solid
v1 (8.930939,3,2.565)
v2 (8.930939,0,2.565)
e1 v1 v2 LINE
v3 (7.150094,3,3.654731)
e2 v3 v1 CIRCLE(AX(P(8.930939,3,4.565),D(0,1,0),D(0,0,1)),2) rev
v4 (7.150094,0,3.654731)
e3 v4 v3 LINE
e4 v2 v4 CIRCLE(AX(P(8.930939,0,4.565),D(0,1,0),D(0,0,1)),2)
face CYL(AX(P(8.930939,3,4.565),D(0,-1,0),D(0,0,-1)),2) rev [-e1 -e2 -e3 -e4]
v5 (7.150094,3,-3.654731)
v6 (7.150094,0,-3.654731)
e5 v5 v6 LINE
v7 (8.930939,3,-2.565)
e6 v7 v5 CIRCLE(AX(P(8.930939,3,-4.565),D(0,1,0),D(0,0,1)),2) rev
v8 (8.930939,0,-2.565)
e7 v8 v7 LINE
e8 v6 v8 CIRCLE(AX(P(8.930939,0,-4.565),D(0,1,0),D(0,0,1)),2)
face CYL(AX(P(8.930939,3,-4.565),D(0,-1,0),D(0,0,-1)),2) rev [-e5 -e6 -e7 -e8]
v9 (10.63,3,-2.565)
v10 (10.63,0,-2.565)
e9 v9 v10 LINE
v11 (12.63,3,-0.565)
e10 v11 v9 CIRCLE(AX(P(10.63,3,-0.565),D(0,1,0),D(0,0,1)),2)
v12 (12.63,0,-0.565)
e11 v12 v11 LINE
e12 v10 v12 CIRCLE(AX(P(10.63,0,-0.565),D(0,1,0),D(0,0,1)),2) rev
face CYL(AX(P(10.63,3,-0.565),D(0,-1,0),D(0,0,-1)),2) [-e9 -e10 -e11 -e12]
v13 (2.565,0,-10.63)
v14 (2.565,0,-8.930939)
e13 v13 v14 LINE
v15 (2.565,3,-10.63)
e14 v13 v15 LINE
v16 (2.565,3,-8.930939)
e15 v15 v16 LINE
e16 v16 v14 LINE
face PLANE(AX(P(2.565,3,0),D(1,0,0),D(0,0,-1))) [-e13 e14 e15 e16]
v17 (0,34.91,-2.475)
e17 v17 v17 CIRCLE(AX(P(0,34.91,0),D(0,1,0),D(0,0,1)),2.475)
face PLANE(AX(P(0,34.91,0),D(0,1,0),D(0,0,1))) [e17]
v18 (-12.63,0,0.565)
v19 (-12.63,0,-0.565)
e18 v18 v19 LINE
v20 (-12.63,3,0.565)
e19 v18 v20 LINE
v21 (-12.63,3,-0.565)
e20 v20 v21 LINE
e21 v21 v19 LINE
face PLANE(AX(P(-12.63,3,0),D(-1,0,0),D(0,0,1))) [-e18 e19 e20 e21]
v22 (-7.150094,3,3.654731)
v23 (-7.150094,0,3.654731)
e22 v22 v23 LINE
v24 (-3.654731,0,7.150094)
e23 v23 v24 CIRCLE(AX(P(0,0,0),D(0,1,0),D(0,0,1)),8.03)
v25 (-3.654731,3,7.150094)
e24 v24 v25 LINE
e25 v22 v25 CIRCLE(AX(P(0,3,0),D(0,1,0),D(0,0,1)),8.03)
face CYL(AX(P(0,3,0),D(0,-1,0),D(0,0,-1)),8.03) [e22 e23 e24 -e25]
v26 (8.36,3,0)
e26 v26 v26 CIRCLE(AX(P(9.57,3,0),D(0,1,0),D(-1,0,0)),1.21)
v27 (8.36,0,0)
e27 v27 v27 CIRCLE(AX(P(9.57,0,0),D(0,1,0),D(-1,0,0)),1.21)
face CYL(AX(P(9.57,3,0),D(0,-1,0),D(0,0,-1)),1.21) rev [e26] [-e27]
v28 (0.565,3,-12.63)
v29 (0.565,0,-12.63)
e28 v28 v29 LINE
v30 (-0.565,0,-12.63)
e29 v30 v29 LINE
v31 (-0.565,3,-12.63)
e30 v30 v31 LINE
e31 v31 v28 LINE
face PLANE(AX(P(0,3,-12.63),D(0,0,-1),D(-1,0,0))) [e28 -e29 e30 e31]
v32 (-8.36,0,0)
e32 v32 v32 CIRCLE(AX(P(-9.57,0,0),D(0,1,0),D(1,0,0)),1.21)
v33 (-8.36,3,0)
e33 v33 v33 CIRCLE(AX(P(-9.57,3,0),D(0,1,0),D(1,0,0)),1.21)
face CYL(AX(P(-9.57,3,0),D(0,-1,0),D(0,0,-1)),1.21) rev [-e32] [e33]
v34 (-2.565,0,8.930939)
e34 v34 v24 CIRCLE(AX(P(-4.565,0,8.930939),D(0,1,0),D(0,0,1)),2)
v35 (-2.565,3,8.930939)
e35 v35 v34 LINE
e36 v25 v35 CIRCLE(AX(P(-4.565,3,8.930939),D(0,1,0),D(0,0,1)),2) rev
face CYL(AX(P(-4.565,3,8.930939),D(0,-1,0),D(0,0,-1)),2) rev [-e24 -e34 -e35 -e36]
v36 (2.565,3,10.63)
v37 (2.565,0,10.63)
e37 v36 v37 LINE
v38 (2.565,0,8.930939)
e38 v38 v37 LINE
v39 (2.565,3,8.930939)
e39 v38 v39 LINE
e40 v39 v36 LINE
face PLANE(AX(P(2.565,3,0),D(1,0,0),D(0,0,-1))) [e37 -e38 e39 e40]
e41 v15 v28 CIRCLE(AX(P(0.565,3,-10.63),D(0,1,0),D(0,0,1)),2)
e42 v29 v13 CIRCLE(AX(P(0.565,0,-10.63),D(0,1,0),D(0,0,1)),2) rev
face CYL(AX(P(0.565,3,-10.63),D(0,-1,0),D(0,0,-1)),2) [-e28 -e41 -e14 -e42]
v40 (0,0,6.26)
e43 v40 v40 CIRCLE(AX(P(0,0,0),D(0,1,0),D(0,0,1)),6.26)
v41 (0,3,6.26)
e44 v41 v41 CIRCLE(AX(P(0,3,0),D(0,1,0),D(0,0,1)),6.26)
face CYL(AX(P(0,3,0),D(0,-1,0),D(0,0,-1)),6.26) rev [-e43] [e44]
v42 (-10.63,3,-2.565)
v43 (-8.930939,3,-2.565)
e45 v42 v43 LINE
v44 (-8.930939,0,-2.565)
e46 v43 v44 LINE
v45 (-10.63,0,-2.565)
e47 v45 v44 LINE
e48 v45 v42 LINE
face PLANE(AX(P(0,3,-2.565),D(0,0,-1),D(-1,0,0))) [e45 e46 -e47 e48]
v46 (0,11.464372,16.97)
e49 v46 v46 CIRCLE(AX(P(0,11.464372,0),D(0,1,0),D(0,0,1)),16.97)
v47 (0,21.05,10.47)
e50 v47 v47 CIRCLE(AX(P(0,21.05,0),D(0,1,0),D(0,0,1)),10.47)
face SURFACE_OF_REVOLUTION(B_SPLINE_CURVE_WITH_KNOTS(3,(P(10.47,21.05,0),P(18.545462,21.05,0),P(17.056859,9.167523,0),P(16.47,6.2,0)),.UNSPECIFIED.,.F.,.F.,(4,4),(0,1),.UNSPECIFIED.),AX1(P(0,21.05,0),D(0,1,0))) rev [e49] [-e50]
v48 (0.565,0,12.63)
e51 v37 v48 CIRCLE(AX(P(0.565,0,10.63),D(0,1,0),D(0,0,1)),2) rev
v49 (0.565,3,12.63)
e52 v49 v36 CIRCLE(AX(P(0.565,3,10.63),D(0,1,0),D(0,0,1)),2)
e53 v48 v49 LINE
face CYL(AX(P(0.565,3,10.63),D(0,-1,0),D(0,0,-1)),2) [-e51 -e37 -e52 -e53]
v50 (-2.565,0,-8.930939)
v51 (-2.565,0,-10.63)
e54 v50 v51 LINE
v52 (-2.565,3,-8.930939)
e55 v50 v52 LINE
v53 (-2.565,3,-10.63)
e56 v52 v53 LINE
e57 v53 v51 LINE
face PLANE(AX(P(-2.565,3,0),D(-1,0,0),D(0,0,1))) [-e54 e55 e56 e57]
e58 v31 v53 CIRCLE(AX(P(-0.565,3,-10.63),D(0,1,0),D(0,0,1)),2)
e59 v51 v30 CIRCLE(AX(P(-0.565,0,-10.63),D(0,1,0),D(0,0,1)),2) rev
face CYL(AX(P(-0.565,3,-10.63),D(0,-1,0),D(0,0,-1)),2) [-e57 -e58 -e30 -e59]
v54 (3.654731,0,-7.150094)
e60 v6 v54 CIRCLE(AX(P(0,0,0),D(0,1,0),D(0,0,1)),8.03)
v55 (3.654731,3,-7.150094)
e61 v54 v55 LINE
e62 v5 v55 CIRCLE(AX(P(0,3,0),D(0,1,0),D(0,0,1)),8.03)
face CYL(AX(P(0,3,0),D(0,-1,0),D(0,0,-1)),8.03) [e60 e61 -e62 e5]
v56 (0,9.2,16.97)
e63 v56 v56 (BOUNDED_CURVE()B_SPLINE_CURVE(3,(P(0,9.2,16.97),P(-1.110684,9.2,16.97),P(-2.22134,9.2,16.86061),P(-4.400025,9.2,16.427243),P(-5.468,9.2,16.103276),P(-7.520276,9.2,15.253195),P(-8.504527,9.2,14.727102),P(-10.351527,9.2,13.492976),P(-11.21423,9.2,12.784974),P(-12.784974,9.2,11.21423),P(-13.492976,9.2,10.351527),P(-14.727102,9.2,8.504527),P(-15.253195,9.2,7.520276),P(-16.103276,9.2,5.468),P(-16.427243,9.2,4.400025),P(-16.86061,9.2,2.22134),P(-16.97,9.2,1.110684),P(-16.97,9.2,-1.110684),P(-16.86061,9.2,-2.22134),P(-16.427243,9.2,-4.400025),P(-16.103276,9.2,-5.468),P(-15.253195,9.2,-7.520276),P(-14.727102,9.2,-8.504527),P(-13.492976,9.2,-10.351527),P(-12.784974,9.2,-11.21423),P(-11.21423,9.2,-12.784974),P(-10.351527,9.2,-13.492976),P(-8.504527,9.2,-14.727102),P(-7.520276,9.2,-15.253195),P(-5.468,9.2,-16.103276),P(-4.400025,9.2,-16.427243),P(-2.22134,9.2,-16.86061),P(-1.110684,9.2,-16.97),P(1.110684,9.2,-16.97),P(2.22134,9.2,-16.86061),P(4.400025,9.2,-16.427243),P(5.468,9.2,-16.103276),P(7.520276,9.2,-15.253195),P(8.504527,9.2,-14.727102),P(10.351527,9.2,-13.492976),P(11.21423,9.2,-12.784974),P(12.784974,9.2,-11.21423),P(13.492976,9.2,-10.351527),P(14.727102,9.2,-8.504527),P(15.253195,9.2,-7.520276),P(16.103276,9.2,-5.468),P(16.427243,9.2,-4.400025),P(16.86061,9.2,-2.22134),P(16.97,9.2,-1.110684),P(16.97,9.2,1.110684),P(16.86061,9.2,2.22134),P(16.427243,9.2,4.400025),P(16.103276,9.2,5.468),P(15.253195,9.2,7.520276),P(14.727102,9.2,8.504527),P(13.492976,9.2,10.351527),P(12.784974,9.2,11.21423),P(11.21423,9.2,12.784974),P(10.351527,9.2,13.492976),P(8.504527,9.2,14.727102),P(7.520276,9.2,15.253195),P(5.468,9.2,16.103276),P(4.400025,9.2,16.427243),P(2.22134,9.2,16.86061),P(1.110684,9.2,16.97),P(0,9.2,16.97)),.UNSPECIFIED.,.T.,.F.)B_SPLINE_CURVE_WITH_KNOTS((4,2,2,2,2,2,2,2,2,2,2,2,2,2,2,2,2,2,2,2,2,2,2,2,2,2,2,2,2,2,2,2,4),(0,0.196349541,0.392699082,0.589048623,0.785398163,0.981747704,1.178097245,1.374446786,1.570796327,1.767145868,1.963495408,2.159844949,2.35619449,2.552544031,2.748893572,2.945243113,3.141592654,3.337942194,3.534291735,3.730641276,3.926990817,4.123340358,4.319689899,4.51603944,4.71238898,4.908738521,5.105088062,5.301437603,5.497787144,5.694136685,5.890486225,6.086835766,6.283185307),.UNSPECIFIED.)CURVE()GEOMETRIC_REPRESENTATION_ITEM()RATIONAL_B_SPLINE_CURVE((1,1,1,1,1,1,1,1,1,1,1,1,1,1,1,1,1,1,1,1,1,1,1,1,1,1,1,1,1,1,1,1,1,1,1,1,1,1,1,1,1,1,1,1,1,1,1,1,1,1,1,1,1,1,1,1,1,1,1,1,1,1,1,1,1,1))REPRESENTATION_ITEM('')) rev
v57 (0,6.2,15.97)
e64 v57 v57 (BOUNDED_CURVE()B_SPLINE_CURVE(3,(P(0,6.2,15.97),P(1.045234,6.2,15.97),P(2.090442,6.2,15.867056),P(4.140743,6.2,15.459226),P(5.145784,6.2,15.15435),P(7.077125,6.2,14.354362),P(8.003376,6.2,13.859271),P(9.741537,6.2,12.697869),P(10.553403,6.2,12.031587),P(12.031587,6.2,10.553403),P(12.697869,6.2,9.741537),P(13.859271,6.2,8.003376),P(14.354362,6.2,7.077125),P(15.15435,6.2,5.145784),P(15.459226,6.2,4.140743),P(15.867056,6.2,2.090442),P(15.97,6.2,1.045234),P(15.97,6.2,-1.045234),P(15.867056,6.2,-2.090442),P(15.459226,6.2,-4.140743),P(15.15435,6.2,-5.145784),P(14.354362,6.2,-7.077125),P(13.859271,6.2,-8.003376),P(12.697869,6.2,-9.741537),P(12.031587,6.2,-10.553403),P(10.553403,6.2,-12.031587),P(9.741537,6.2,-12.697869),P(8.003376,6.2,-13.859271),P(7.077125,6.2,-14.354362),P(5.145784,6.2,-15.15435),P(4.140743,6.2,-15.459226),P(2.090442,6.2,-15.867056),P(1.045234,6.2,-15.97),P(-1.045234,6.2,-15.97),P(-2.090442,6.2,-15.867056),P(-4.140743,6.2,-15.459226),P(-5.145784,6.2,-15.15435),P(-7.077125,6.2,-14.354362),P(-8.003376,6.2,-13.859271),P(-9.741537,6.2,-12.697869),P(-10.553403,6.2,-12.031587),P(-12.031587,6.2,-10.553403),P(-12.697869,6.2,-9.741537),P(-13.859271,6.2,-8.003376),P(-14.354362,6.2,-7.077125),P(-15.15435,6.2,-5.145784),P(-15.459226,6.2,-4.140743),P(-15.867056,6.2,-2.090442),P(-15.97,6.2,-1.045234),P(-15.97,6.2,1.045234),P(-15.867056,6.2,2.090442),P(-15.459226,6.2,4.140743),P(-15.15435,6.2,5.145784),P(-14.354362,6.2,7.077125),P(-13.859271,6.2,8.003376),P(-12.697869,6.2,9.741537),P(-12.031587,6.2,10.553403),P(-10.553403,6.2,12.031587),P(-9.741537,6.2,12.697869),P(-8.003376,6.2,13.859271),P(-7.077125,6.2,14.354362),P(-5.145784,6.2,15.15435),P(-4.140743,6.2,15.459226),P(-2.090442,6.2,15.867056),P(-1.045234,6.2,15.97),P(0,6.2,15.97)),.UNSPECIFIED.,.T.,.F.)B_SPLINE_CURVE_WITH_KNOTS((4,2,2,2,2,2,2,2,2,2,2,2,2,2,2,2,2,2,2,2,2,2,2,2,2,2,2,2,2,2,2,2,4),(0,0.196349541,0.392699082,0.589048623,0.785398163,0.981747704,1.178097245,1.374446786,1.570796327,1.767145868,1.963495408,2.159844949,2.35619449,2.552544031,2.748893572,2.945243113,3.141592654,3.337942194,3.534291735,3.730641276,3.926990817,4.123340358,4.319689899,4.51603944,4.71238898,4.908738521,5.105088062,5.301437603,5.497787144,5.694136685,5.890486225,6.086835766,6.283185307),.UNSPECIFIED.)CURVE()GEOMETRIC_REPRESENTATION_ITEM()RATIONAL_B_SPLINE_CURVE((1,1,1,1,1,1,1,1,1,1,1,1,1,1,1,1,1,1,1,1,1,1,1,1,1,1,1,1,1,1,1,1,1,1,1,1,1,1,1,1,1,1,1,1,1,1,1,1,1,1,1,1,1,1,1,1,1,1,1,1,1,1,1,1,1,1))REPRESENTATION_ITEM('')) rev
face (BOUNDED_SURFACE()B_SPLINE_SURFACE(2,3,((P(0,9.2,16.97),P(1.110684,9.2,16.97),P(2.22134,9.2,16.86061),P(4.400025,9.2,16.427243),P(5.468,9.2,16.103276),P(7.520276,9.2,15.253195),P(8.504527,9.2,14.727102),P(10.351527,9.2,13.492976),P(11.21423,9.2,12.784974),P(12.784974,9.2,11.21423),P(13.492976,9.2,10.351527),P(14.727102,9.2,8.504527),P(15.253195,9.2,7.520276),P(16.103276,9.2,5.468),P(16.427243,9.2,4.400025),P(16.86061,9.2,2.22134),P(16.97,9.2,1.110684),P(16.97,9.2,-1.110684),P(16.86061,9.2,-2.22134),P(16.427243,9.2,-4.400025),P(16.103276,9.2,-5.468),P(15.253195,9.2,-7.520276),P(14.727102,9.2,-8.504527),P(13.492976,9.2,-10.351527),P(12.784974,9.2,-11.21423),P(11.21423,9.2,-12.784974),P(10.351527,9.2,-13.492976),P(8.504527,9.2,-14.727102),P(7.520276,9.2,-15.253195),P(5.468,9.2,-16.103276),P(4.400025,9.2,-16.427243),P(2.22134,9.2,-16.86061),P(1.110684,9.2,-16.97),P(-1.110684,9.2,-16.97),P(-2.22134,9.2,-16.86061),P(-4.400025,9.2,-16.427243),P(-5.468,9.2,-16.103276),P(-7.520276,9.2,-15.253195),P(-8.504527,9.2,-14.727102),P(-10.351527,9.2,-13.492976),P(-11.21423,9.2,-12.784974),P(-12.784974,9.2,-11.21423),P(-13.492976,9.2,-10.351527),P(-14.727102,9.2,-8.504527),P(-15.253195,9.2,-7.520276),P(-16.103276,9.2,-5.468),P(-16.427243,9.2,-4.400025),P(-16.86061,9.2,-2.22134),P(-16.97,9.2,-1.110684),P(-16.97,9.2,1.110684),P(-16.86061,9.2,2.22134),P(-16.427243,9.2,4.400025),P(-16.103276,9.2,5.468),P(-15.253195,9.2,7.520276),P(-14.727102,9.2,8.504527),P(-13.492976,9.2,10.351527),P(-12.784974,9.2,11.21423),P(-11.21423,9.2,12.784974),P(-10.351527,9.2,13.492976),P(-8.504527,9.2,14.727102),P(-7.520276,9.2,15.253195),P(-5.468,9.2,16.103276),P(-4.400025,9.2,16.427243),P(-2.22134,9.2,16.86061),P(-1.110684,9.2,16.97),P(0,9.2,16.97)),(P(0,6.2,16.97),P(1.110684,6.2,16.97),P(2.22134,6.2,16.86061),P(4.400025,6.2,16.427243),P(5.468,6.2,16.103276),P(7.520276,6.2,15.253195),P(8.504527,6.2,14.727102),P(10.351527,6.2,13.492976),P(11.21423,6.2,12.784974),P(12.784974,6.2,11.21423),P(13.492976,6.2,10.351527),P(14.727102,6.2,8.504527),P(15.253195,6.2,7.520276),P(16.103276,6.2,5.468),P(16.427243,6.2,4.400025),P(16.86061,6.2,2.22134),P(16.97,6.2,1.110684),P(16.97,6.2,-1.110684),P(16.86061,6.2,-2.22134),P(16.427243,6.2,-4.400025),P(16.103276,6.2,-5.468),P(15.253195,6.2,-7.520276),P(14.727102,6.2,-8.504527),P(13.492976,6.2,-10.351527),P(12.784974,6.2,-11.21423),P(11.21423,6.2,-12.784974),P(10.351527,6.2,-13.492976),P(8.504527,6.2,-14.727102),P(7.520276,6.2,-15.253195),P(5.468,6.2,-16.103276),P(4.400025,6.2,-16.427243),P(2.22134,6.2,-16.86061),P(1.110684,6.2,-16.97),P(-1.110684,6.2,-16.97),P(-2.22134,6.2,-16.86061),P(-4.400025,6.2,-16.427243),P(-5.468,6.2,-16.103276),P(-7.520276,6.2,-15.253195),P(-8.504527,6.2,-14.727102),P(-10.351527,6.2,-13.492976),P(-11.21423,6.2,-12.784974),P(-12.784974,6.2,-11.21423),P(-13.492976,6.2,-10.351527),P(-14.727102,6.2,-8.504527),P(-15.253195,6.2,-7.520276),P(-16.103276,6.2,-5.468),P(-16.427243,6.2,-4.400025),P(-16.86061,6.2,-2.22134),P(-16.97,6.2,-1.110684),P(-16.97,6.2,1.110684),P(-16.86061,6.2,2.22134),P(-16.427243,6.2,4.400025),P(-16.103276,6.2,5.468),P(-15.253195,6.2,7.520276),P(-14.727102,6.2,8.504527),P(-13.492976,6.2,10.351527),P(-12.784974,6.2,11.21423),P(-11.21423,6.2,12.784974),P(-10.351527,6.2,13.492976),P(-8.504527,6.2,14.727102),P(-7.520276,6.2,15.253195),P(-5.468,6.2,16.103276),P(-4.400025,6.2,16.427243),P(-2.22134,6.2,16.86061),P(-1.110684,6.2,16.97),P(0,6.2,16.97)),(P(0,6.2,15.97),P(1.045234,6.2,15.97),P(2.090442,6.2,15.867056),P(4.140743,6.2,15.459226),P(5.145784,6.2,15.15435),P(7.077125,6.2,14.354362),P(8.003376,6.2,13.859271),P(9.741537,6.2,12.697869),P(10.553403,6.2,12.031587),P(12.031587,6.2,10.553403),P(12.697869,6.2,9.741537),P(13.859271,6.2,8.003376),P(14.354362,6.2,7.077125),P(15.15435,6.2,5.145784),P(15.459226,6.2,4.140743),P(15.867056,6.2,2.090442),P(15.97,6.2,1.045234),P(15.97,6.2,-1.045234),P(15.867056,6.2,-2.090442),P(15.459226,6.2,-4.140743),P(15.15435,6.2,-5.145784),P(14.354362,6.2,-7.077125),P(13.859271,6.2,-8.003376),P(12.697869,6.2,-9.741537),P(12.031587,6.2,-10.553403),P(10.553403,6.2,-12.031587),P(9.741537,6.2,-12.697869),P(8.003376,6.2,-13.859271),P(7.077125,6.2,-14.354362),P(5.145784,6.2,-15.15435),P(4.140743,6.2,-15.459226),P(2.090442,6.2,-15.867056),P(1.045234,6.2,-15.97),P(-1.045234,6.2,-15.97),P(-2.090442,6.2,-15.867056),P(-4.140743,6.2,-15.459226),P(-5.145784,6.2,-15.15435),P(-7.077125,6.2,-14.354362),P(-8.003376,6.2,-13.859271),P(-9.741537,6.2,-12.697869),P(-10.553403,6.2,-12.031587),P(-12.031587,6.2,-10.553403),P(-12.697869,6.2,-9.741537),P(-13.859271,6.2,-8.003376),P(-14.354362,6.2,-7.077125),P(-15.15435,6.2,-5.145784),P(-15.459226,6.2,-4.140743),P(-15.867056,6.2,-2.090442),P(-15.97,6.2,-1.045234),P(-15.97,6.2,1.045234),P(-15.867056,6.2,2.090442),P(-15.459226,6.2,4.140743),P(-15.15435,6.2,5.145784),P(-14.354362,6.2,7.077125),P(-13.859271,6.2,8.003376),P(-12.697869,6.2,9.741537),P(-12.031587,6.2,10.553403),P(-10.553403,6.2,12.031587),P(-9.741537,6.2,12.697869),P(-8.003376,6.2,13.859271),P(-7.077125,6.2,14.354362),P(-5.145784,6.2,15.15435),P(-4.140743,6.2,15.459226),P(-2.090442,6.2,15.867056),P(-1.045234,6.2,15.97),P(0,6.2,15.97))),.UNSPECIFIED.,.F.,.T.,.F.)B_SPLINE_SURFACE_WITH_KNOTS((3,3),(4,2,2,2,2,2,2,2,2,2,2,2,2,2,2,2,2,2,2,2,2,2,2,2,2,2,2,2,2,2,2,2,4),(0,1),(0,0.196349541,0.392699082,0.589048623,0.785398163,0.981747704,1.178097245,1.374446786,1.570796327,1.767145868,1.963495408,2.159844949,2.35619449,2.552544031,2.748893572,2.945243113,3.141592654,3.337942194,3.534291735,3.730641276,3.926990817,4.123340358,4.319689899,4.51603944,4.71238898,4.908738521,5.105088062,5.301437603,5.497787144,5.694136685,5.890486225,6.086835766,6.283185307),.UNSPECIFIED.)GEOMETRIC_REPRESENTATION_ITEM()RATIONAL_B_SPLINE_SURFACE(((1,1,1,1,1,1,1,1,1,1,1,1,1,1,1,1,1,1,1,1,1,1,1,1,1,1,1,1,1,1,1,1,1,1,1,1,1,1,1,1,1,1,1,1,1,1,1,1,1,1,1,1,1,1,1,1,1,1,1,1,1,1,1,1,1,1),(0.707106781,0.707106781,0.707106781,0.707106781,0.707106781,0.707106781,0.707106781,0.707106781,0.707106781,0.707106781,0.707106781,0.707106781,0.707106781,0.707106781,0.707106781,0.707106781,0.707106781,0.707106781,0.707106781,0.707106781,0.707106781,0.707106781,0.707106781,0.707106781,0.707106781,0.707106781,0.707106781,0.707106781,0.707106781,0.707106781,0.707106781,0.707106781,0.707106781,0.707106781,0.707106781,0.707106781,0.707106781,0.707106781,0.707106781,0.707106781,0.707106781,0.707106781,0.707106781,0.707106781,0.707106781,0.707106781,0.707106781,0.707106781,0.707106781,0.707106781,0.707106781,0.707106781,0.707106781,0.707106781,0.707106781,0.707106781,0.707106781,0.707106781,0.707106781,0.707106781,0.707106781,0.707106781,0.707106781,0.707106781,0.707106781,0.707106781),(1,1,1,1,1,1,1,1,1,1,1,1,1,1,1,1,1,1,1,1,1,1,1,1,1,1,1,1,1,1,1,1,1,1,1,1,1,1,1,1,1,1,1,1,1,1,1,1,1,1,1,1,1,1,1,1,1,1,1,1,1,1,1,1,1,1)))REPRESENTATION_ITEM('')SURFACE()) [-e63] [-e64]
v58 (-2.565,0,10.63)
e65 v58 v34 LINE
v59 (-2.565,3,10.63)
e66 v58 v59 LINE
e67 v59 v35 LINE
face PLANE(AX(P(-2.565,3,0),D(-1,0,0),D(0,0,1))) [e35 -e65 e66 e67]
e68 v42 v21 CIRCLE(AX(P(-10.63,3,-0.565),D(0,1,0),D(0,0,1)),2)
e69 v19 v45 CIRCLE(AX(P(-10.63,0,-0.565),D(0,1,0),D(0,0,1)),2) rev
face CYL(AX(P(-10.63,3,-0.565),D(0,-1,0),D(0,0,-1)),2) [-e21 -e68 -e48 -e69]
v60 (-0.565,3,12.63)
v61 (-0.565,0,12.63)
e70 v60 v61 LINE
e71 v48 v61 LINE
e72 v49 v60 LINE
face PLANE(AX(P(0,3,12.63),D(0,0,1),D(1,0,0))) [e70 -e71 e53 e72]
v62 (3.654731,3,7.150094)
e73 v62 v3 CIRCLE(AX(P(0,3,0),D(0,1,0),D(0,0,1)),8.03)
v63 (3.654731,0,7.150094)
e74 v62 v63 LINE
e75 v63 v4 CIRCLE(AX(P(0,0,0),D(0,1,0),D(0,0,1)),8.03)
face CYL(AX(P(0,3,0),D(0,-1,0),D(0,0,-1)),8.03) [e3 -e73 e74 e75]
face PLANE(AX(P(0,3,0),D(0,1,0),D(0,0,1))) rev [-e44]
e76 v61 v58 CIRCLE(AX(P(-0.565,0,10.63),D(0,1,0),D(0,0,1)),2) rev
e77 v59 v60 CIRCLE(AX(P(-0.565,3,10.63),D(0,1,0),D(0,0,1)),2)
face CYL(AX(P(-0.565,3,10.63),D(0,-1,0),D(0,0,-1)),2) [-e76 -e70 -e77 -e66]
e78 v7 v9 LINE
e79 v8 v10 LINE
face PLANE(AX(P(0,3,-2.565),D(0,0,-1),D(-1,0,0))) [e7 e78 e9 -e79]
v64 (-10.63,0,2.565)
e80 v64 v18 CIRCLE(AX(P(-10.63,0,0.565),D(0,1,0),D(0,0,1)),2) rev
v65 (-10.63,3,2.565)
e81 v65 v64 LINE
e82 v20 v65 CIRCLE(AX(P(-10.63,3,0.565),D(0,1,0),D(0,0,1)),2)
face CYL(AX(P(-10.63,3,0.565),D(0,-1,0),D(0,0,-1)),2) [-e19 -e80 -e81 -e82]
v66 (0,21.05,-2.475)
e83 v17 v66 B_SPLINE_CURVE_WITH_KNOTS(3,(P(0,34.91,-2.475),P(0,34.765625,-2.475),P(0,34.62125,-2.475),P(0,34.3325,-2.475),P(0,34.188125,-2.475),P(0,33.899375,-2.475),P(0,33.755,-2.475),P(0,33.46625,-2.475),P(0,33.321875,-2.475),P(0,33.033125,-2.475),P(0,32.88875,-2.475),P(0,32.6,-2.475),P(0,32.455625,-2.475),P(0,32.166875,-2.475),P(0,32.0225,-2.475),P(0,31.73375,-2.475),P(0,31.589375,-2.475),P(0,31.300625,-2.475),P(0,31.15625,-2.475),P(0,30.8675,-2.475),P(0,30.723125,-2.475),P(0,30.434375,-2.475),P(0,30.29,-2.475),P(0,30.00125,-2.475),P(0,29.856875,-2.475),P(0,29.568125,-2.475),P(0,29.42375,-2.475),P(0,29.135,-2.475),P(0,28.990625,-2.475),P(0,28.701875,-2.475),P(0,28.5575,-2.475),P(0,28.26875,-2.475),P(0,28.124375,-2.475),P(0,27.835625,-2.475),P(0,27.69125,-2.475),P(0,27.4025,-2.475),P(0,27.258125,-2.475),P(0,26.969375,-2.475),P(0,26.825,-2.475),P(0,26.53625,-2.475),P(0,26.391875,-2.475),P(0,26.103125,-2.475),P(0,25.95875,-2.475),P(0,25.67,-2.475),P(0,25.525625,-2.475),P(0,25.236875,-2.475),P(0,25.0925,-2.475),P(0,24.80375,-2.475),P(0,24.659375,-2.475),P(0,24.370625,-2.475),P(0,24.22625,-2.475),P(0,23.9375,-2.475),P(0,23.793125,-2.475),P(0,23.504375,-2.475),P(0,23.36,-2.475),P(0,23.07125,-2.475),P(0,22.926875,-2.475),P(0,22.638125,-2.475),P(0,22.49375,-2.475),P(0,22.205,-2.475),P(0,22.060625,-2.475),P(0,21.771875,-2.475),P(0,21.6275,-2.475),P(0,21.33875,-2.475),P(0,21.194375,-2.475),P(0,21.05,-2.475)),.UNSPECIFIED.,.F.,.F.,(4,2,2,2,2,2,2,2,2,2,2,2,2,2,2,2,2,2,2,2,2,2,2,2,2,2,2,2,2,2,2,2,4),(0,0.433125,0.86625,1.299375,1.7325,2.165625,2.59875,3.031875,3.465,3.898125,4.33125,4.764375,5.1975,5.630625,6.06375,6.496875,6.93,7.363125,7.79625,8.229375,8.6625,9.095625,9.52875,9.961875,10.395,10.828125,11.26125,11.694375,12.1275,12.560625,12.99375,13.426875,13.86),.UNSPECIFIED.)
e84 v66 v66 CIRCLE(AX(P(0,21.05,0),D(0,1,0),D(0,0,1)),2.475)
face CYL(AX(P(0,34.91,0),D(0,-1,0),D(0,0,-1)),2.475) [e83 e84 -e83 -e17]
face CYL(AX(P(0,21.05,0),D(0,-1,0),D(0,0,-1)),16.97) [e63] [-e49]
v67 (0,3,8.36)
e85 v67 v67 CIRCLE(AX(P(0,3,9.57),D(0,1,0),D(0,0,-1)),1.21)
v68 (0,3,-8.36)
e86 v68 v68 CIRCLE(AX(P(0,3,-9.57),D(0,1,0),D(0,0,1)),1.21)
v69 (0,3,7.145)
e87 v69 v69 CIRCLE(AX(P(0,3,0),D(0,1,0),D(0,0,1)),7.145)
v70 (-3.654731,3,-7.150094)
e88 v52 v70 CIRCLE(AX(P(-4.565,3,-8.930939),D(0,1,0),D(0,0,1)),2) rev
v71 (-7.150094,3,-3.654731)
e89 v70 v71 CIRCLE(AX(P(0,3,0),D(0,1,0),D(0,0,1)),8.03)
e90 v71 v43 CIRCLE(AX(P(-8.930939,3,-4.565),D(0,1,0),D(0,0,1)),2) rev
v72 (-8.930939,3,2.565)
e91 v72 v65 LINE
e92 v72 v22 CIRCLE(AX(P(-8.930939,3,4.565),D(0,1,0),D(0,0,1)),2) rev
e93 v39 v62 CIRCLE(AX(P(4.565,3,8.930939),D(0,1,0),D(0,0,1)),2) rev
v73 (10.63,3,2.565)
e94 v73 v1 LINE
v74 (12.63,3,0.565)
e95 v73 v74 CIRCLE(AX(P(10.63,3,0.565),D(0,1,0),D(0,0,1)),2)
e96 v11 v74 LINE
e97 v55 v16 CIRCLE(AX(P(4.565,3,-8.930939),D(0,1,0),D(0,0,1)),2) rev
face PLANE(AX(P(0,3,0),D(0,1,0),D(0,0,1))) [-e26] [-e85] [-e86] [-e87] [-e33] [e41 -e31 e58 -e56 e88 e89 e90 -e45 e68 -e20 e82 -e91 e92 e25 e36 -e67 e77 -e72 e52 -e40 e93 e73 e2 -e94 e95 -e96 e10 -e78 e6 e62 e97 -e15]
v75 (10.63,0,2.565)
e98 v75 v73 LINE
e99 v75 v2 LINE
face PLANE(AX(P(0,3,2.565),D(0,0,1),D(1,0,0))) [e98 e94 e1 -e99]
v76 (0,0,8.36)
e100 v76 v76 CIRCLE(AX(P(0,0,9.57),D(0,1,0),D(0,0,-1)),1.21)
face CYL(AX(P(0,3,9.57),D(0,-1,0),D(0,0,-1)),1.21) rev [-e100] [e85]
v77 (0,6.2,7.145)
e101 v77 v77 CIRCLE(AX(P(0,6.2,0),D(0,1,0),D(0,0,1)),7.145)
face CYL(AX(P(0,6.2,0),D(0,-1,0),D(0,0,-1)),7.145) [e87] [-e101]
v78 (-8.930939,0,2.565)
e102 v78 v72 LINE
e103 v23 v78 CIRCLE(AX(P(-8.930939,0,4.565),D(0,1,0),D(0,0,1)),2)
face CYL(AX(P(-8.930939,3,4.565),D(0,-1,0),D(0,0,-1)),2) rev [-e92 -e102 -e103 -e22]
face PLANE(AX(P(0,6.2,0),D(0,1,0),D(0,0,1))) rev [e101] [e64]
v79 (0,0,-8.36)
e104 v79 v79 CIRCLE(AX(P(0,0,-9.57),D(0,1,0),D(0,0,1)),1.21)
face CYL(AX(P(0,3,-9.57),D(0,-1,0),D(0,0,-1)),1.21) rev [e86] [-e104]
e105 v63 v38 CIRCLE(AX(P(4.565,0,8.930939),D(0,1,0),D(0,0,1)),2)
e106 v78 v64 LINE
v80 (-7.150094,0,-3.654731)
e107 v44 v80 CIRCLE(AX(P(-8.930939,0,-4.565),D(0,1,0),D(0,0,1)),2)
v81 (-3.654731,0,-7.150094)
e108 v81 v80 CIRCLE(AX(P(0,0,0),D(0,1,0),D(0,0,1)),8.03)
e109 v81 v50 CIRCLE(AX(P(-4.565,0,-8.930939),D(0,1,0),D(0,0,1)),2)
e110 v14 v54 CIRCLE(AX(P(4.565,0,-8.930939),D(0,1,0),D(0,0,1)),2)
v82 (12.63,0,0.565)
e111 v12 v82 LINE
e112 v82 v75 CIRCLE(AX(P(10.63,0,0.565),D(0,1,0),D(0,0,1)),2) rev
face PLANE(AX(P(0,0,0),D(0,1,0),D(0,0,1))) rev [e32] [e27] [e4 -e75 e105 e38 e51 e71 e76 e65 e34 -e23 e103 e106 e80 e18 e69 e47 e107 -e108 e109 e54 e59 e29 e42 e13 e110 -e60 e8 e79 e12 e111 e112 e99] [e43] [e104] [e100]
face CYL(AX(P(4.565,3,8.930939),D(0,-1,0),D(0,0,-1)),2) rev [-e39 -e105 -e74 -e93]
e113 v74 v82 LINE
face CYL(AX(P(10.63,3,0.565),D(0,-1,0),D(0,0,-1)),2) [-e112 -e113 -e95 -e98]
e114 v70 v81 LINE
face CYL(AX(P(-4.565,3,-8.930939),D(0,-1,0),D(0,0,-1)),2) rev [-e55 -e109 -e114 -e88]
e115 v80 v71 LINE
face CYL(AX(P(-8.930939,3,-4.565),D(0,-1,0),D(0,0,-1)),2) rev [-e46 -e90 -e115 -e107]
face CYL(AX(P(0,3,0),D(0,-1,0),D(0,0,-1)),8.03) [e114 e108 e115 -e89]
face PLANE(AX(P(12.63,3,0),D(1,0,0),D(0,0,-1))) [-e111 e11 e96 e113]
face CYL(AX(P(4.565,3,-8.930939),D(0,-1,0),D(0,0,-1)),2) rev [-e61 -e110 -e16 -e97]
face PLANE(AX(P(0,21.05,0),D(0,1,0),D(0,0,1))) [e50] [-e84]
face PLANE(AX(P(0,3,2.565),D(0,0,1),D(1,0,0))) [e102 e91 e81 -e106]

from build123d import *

# Parameters (mm, degrees)
SKETCH1_R                = 8.03
SKETCH1_R_2              = 6.26
BOSS_EXTRUDE1_DEPTH      = 3
SKETCH1_4_R              = 1.21
BOSS_EXTRUDE3_DEPTH      = 3
FILLET1_R                = 2
CIRPATTERN1_COUNT        = 4
FILLET1_OF_CIRPATTERN1_R = 2
BOSS_EXTRUDE4_START      = 3
SKETCH1_5_R              = 7.145
SKETCH1_5_R_2            = 6.26
SKETCH1_5_R_3            = 2.475
BOSS_EXTRUDE4_DEPTH      = 3.2
BOSS_EXTRUDE5_START      = 6.2
SKETCH1_6_R              = 16.97
BOSS_EXTRUDE5_DEPTH      = 14.85
BOSS_EXTRUDE6_START      = 21.05
SKETCH1_7_R              = 2.475
BOSS_EXTRUDE6_DEPTH      = 13.86
FILLET3_SIZE             = 3
FILLET3_SIZE_2           = 1


with BuildPart() as part:
    # Sketch1 → Boss-Extrude1 (new body)
    with BuildSketch(Plane(origin=(0, 0, 0), x_dir=(1, 0, 0), z_dir=(0, 1, 0))):
        with Locations(Location((0, 0, 0), (0, 0, 270))):
            Circle(SKETCH1_R)
        with Locations(Location((0, 0, 0), (0, 0, 270))):
            Circle(SKETCH1_R_2, mode=Mode.SUBTRACT)
    extrude(amount=BOSS_EXTRUDE1_DEPTH)

    # Sketch1<4> → Boss-Extrude3 (add)
    with BuildSketch(Plane(origin=(0, 0, 0), x_dir=(1, 0, 0), z_dir=(0, 1, 0))):
        with BuildLine():
            Line((-2.565, 12.63), (-2.565, 7.609315015))
            ThreePointArc((-2.565, 7.609315015), (0, 8.03), (2.565, 7.609315015))
            Line((2.565, 7.609315015), (2.565, 12.63))
            Line((2.565, 12.63), (-2.565, 12.63))
        make_face()
        with Locations(Location((0, 9.57, 0), (0, 0, 270))):
            Circle(SKETCH1_4_R, mode=Mode.SUBTRACT)
    boss_extrude3 = extrude(amount=BOSS_EXTRUDE3_DEPTH)

    # Fillet1
    fillet1_edges = [part.edges().sort_by_distance(p)[0] for p in [
        (-2.565, 1.5, -7.609315015),
        (2.565, 1.5, -7.609315015),
        (2.565, 1.5, -12.63),
        (-2.565, 1.5, -12.63),
    ]]
    fillet(fillet1_edges, radius=FILLET1_R)

    # CirPattern1: Boss-Extrude3 ×4 about axis
    cirpattern1_axis = Axis((0, 0, 0), (0, 1, 0))
    for i in range(1, CIRPATTERN1_COUNT):
        add(boss_extrude3.rotate(cirpattern1_axis, i * 360 / CIRPATTERN1_COUNT))

    # Fillet1 of CirPattern1
    fillet1_of_cirpattern1_edges = [part.edges().sort_by_distance(p)[0] for p in [
        (-7.609315015, 1.5, 2.565),
        (-7.609315015, 1.5, -2.565),
        (-12.63, 1.5, -2.565),
        (-12.63, 1.5, 2.565),
        (2.565, 1.5, 7.609315015),
        (-2.565, 1.5, 7.609315015),
        (-2.565, 1.5, 12.63),
        (2.565, 1.5, 12.63),
        (7.609315015, 1.5, -2.565),
        (7.609315015, 1.5, 2.565),
        (12.63, 1.5, 2.565),
        (12.63, 1.5, -2.565),
    ]]
    fillet(fillet1_of_cirpattern1_edges, radius=FILLET1_OF_CIRPATTERN1_R)

    # Sketch1<5> → Boss-Extrude4 (add)
    # profile 1 of 3: a face of its own
    with BuildSketch(Plane(origin=(0, 0, 0), x_dir=(1, 0, 0), z_dir=(0, 1, 0)).offset(BOSS_EXTRUDE4_START)):
        with Locations(Location((0, 0, 0), (0, 0, 270))):
            Circle(SKETCH1_5_R)
        with Locations(Location((0, 0, 0), (0, 0, 270))):
            Circle(SKETCH1_5_R_2, mode=Mode.SUBTRACT)
    # profile 2 of 3: a face of its own
    with BuildSketch(Plane(origin=(0, 0, 0), x_dir=(1, 0, 0), z_dir=(0, 1, 0)).offset(BOSS_EXTRUDE4_START)):
        with Locations(Location((0, 0, 0), (0, 0, 270))):
            Circle(SKETCH1_5_R_2)
        Circle(SKETCH1_5_R_3, mode=Mode.SUBTRACT)
    # profile 3 of 3: a face of its own
    with BuildSketch(Plane(origin=(0, 0, 0), x_dir=(1, 0, 0), z_dir=(0, 1, 0)).offset(BOSS_EXTRUDE4_START)):
        Circle(SKETCH1_5_R_3)
    extrude(amount=BOSS_EXTRUDE4_DEPTH)

    # Sketch1<6> → Boss-Extrude5 (add)
    with BuildSketch(Plane(origin=(0, 0, 0), x_dir=(1, 0, 0), z_dir=(0, 1, 0)).offset(BOSS_EXTRUDE5_START)):
        with Locations(Location((0, 0, 0), (0, 0, 270))):
            Circle(SKETCH1_6_R)
    extrude(amount=BOSS_EXTRUDE5_DEPTH)

    # Sketch1<7> → Boss-Extrude6 (add)
    with BuildSketch(Plane(origin=(0, 0, 0), x_dir=(1, 0, 0), z_dir=(0, 1, 0)).offset(BOSS_EXTRUDE6_START)):
        with Locations(Location((0, 0, 0), (0, 0, 90))):
            Circle(SKETCH1_7_R)
    extrude(amount=BOSS_EXTRUDE6_DEPTH)

    # Sketch2 → Cut-Revolve2 (revolve, cut)
    with BuildSketch(Plane.XY, mode=Mode.PRIVATE) as cut_revolve2_sk:
        with BuildLine():
            add(Edge.make_bspline(
                [(10.47, 21.05), (15.814758039, 21.05), (16.969999933, 15.844909447), (16.97, 11.464372124)],
                knots=[0, 0, 0, 0, 0.661851635, 0.661851635, 0.661851635, 0.661851635], degree=3))
            Line((16.97, 11.464372124), (16.97, 21.05))
            Line((16.97, 21.05), (10.47, 21.05))
        make_face()
    revolve(cut_revolve2_sk.sketch.rotate(Axis((0, 21.05, 0), (0, -1, 0)), 90), axis=Axis((0, 21.05, 0), (0, -1, 0)), mode=Mode.SUBTRACT)

    # Fillet3
    # an asymmetric fillet: 3, 1 mm, written as the material it takes off along each edge
    with BuildSketch(Plane(origin=(0, 6.2, 0), x_dir=(0, 0, 1), z_dir=(-1, 0, 0))) as fillet3_piece_1:
        with BuildLine():
            Bezier((16.97, FILLET3_SIZE), (16.97, 0), (16.97 - FILLET3_SIZE_2, 0), weights=[1, 0.707106781, 1])
            Line((16.97 - FILLET3_SIZE_2, 0), (16.97, 0))
            Line((16.97, 0), (16.97, FILLET3_SIZE))
        make_face()
    revolve(axis=Axis((0, 6.2, 0), (0, 1, 0)), mode=Mode.SUBTRACT)


solid = part.part
